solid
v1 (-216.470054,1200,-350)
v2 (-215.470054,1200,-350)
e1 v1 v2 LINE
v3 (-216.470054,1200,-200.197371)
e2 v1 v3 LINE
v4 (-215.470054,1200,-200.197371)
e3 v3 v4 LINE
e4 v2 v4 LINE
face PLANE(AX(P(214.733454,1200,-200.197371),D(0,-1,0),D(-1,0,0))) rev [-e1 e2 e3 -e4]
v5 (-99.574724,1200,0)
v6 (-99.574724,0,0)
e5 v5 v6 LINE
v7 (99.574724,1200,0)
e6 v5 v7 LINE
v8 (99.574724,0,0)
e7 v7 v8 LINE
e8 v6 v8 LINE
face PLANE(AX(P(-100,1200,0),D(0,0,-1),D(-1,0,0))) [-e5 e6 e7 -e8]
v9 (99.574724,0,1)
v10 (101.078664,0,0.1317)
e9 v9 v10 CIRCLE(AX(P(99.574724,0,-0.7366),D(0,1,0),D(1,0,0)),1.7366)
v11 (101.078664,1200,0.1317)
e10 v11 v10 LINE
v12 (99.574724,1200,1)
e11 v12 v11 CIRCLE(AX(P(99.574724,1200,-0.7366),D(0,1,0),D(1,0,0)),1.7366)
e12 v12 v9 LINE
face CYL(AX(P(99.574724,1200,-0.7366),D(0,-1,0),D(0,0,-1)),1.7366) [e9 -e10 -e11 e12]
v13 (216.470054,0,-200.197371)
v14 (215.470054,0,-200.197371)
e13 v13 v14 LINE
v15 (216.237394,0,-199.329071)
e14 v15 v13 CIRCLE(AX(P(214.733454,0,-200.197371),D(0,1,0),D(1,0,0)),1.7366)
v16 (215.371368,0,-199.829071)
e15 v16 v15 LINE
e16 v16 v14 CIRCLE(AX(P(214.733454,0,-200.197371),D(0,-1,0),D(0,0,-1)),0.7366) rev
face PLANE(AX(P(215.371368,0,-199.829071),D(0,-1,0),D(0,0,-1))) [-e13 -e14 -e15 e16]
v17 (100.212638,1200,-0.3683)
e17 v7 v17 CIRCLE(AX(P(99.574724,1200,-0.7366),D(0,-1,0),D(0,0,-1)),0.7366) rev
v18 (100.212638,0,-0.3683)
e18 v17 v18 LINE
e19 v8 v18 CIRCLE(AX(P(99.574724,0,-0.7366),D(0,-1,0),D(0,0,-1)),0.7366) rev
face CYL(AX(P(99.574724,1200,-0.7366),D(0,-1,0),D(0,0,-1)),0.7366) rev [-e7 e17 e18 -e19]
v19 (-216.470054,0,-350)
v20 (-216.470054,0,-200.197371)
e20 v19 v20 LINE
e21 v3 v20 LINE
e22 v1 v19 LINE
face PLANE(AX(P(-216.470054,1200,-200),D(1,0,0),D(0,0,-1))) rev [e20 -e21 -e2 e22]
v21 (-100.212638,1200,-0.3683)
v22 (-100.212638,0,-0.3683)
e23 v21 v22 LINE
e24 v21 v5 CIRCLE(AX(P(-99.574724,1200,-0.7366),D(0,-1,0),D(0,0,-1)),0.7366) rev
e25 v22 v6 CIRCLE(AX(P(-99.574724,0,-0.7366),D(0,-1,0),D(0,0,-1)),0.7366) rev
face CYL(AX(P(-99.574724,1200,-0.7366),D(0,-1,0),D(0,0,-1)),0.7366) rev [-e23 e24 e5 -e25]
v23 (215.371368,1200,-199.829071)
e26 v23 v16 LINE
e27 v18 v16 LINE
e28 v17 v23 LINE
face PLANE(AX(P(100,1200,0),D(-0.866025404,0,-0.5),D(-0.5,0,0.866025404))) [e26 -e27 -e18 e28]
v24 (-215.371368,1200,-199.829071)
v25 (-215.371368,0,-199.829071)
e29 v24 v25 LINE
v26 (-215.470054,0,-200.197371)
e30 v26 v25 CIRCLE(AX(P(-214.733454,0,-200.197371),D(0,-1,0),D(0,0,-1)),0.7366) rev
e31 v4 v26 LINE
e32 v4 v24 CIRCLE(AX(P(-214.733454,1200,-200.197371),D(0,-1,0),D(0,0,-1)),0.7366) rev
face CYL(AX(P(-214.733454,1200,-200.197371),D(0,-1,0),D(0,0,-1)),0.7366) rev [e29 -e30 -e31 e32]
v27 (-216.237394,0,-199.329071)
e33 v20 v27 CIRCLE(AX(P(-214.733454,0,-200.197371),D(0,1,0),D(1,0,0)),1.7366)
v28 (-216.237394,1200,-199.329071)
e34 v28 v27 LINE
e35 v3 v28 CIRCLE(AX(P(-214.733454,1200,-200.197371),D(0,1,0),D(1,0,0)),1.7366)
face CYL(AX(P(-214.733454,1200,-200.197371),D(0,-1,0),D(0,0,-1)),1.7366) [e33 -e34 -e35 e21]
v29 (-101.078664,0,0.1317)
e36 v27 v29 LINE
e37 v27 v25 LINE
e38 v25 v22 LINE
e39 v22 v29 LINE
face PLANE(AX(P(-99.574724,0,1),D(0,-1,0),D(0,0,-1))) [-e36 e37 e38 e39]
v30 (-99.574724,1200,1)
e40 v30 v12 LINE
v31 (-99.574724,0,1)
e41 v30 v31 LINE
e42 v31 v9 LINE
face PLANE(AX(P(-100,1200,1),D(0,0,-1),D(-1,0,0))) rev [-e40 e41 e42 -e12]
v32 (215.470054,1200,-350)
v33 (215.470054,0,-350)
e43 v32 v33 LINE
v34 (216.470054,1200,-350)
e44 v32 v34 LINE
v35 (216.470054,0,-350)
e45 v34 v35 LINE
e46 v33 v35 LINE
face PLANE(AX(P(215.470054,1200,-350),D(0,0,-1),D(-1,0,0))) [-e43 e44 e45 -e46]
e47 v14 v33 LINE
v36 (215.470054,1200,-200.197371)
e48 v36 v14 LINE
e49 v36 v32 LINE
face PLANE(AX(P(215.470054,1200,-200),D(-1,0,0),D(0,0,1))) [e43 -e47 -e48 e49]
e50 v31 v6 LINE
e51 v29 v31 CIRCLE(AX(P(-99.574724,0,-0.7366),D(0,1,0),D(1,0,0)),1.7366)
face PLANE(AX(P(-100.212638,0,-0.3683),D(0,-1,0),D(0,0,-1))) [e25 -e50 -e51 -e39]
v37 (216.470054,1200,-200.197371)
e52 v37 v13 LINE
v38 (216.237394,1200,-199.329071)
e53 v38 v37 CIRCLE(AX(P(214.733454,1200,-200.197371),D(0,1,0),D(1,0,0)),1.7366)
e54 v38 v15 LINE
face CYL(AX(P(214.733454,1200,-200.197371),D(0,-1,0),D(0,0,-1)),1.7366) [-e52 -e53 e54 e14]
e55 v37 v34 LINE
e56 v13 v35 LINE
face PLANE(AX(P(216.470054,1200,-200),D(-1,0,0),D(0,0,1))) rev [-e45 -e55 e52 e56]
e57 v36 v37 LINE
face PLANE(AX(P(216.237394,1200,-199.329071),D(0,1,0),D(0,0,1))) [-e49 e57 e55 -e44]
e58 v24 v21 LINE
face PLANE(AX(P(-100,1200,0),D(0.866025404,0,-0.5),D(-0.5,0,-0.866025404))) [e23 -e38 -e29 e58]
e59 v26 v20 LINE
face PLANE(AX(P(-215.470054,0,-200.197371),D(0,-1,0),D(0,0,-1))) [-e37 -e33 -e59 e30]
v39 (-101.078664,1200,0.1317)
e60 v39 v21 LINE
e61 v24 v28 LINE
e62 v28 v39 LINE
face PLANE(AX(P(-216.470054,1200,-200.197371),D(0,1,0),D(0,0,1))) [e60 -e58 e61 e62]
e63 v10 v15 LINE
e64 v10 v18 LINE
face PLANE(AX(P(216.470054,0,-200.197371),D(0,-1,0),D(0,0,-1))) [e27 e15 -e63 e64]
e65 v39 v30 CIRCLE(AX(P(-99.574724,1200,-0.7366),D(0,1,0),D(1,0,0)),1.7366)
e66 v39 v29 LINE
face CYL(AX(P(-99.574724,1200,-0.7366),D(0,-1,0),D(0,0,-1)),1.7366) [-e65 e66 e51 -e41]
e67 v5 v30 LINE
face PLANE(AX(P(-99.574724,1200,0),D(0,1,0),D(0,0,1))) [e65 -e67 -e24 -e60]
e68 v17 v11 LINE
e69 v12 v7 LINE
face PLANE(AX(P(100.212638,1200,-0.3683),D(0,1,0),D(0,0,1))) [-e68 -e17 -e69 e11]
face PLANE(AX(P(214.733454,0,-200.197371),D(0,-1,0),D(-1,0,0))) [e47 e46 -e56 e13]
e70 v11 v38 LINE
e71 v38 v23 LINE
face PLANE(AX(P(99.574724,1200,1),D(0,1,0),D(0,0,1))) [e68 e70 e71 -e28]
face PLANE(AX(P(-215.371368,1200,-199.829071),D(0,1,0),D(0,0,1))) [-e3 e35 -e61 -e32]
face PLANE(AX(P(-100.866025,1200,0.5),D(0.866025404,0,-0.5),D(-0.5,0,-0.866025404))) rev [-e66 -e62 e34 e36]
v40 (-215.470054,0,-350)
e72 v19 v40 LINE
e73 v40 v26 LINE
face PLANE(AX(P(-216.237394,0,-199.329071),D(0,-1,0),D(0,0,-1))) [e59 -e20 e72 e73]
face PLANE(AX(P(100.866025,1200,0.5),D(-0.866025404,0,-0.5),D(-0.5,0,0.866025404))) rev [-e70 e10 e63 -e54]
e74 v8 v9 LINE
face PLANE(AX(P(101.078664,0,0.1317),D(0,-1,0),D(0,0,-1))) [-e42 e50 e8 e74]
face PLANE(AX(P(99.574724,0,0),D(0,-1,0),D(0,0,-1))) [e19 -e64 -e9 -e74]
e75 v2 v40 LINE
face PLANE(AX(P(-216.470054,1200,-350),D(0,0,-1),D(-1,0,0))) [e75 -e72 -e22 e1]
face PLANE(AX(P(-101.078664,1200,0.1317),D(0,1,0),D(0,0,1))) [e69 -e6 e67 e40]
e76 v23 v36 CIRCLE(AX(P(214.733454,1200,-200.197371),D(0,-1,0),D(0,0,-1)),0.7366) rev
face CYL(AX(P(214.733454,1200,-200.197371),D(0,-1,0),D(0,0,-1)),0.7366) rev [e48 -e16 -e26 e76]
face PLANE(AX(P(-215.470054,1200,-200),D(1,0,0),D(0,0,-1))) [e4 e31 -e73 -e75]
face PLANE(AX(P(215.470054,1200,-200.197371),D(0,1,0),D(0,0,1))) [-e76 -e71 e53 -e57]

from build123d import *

# Parameters (mm, degrees)
BASE_FLANGE1_DEPTH = 1200


# Sheet-metal steps are written as plain solids
with BuildPart() as part:
    # Sketch3 → Base-Flange1 (new body)
    with BuildSketch(Plane(origin=(0, 0, 0), x_dir=(1, 0, 0), z_dir=(0, 1, 0))):
        with BuildLine():
            Line((-215.470053838, 350), (-215.470053838, 200.197371375))
            ThreePointArc((-215.470053838, 200.197371375), (-215.444954802, 200.006725267), (-215.37136815, 199.829071375))
            Line((-215.37136815, 199.829071375), (-100.212638104, 0.3683))
            ThreePointArc((-100.212638104, 0.3683), (-99.943023792, 0.098685688), (-99.574723792, 0))
            Line((-99.574723792, 0), (99.574723792, 0))
            ThreePointArc((99.574723792, 0), (99.943023792, 0.098685688), (100.212638104, 0.3683))
            Line((100.212638104, 0.3683), (215.37136815, 199.829071375))
            ThreePointArc((215.37136815, 199.829071375), (215.444954802, 200.006725267), (215.470053838, 200.197371375))
            Line((215.470053838, 200.197371375), (215.470053838, 350))
            Line((215.470053838, 350), (216.470053838, 350))
            Line((216.470053838, 350), (216.470053838, 200.197371375))
            ThreePointArc((216.470053838, 200.197371375), (216.410880628, 199.747906221), (216.237393554, 199.329071375))
            Line((216.237393554, 199.329071375), (101.078663508, -0.1317))
            ThreePointArc((101.078663508, -0.1317), (100.443023792, -0.767339716), (99.574723792, -1))
            Line((99.574723792, -1), (-99.574723792, -1))
            ThreePointArc((-99.574723792, -1), (-100.443023792, -0.767339716), (-101.078663508, -0.1317))
            Line((-101.078663508, -0.1317), (-216.237393554, 199.329071375))
            ThreePointArc((-216.237393554, 199.329071375), (-216.410880628, 199.747906221), (-216.470053838, 200.197371375))
            Line((-216.470053838, 200.197371375), (-216.470053838, 350))
            Line((-216.470053838, 350), (-215.470053838, 350))
        make_face()
    extrude(amount=BASE_FLANGE1_DEPTH)


solid = part.part
